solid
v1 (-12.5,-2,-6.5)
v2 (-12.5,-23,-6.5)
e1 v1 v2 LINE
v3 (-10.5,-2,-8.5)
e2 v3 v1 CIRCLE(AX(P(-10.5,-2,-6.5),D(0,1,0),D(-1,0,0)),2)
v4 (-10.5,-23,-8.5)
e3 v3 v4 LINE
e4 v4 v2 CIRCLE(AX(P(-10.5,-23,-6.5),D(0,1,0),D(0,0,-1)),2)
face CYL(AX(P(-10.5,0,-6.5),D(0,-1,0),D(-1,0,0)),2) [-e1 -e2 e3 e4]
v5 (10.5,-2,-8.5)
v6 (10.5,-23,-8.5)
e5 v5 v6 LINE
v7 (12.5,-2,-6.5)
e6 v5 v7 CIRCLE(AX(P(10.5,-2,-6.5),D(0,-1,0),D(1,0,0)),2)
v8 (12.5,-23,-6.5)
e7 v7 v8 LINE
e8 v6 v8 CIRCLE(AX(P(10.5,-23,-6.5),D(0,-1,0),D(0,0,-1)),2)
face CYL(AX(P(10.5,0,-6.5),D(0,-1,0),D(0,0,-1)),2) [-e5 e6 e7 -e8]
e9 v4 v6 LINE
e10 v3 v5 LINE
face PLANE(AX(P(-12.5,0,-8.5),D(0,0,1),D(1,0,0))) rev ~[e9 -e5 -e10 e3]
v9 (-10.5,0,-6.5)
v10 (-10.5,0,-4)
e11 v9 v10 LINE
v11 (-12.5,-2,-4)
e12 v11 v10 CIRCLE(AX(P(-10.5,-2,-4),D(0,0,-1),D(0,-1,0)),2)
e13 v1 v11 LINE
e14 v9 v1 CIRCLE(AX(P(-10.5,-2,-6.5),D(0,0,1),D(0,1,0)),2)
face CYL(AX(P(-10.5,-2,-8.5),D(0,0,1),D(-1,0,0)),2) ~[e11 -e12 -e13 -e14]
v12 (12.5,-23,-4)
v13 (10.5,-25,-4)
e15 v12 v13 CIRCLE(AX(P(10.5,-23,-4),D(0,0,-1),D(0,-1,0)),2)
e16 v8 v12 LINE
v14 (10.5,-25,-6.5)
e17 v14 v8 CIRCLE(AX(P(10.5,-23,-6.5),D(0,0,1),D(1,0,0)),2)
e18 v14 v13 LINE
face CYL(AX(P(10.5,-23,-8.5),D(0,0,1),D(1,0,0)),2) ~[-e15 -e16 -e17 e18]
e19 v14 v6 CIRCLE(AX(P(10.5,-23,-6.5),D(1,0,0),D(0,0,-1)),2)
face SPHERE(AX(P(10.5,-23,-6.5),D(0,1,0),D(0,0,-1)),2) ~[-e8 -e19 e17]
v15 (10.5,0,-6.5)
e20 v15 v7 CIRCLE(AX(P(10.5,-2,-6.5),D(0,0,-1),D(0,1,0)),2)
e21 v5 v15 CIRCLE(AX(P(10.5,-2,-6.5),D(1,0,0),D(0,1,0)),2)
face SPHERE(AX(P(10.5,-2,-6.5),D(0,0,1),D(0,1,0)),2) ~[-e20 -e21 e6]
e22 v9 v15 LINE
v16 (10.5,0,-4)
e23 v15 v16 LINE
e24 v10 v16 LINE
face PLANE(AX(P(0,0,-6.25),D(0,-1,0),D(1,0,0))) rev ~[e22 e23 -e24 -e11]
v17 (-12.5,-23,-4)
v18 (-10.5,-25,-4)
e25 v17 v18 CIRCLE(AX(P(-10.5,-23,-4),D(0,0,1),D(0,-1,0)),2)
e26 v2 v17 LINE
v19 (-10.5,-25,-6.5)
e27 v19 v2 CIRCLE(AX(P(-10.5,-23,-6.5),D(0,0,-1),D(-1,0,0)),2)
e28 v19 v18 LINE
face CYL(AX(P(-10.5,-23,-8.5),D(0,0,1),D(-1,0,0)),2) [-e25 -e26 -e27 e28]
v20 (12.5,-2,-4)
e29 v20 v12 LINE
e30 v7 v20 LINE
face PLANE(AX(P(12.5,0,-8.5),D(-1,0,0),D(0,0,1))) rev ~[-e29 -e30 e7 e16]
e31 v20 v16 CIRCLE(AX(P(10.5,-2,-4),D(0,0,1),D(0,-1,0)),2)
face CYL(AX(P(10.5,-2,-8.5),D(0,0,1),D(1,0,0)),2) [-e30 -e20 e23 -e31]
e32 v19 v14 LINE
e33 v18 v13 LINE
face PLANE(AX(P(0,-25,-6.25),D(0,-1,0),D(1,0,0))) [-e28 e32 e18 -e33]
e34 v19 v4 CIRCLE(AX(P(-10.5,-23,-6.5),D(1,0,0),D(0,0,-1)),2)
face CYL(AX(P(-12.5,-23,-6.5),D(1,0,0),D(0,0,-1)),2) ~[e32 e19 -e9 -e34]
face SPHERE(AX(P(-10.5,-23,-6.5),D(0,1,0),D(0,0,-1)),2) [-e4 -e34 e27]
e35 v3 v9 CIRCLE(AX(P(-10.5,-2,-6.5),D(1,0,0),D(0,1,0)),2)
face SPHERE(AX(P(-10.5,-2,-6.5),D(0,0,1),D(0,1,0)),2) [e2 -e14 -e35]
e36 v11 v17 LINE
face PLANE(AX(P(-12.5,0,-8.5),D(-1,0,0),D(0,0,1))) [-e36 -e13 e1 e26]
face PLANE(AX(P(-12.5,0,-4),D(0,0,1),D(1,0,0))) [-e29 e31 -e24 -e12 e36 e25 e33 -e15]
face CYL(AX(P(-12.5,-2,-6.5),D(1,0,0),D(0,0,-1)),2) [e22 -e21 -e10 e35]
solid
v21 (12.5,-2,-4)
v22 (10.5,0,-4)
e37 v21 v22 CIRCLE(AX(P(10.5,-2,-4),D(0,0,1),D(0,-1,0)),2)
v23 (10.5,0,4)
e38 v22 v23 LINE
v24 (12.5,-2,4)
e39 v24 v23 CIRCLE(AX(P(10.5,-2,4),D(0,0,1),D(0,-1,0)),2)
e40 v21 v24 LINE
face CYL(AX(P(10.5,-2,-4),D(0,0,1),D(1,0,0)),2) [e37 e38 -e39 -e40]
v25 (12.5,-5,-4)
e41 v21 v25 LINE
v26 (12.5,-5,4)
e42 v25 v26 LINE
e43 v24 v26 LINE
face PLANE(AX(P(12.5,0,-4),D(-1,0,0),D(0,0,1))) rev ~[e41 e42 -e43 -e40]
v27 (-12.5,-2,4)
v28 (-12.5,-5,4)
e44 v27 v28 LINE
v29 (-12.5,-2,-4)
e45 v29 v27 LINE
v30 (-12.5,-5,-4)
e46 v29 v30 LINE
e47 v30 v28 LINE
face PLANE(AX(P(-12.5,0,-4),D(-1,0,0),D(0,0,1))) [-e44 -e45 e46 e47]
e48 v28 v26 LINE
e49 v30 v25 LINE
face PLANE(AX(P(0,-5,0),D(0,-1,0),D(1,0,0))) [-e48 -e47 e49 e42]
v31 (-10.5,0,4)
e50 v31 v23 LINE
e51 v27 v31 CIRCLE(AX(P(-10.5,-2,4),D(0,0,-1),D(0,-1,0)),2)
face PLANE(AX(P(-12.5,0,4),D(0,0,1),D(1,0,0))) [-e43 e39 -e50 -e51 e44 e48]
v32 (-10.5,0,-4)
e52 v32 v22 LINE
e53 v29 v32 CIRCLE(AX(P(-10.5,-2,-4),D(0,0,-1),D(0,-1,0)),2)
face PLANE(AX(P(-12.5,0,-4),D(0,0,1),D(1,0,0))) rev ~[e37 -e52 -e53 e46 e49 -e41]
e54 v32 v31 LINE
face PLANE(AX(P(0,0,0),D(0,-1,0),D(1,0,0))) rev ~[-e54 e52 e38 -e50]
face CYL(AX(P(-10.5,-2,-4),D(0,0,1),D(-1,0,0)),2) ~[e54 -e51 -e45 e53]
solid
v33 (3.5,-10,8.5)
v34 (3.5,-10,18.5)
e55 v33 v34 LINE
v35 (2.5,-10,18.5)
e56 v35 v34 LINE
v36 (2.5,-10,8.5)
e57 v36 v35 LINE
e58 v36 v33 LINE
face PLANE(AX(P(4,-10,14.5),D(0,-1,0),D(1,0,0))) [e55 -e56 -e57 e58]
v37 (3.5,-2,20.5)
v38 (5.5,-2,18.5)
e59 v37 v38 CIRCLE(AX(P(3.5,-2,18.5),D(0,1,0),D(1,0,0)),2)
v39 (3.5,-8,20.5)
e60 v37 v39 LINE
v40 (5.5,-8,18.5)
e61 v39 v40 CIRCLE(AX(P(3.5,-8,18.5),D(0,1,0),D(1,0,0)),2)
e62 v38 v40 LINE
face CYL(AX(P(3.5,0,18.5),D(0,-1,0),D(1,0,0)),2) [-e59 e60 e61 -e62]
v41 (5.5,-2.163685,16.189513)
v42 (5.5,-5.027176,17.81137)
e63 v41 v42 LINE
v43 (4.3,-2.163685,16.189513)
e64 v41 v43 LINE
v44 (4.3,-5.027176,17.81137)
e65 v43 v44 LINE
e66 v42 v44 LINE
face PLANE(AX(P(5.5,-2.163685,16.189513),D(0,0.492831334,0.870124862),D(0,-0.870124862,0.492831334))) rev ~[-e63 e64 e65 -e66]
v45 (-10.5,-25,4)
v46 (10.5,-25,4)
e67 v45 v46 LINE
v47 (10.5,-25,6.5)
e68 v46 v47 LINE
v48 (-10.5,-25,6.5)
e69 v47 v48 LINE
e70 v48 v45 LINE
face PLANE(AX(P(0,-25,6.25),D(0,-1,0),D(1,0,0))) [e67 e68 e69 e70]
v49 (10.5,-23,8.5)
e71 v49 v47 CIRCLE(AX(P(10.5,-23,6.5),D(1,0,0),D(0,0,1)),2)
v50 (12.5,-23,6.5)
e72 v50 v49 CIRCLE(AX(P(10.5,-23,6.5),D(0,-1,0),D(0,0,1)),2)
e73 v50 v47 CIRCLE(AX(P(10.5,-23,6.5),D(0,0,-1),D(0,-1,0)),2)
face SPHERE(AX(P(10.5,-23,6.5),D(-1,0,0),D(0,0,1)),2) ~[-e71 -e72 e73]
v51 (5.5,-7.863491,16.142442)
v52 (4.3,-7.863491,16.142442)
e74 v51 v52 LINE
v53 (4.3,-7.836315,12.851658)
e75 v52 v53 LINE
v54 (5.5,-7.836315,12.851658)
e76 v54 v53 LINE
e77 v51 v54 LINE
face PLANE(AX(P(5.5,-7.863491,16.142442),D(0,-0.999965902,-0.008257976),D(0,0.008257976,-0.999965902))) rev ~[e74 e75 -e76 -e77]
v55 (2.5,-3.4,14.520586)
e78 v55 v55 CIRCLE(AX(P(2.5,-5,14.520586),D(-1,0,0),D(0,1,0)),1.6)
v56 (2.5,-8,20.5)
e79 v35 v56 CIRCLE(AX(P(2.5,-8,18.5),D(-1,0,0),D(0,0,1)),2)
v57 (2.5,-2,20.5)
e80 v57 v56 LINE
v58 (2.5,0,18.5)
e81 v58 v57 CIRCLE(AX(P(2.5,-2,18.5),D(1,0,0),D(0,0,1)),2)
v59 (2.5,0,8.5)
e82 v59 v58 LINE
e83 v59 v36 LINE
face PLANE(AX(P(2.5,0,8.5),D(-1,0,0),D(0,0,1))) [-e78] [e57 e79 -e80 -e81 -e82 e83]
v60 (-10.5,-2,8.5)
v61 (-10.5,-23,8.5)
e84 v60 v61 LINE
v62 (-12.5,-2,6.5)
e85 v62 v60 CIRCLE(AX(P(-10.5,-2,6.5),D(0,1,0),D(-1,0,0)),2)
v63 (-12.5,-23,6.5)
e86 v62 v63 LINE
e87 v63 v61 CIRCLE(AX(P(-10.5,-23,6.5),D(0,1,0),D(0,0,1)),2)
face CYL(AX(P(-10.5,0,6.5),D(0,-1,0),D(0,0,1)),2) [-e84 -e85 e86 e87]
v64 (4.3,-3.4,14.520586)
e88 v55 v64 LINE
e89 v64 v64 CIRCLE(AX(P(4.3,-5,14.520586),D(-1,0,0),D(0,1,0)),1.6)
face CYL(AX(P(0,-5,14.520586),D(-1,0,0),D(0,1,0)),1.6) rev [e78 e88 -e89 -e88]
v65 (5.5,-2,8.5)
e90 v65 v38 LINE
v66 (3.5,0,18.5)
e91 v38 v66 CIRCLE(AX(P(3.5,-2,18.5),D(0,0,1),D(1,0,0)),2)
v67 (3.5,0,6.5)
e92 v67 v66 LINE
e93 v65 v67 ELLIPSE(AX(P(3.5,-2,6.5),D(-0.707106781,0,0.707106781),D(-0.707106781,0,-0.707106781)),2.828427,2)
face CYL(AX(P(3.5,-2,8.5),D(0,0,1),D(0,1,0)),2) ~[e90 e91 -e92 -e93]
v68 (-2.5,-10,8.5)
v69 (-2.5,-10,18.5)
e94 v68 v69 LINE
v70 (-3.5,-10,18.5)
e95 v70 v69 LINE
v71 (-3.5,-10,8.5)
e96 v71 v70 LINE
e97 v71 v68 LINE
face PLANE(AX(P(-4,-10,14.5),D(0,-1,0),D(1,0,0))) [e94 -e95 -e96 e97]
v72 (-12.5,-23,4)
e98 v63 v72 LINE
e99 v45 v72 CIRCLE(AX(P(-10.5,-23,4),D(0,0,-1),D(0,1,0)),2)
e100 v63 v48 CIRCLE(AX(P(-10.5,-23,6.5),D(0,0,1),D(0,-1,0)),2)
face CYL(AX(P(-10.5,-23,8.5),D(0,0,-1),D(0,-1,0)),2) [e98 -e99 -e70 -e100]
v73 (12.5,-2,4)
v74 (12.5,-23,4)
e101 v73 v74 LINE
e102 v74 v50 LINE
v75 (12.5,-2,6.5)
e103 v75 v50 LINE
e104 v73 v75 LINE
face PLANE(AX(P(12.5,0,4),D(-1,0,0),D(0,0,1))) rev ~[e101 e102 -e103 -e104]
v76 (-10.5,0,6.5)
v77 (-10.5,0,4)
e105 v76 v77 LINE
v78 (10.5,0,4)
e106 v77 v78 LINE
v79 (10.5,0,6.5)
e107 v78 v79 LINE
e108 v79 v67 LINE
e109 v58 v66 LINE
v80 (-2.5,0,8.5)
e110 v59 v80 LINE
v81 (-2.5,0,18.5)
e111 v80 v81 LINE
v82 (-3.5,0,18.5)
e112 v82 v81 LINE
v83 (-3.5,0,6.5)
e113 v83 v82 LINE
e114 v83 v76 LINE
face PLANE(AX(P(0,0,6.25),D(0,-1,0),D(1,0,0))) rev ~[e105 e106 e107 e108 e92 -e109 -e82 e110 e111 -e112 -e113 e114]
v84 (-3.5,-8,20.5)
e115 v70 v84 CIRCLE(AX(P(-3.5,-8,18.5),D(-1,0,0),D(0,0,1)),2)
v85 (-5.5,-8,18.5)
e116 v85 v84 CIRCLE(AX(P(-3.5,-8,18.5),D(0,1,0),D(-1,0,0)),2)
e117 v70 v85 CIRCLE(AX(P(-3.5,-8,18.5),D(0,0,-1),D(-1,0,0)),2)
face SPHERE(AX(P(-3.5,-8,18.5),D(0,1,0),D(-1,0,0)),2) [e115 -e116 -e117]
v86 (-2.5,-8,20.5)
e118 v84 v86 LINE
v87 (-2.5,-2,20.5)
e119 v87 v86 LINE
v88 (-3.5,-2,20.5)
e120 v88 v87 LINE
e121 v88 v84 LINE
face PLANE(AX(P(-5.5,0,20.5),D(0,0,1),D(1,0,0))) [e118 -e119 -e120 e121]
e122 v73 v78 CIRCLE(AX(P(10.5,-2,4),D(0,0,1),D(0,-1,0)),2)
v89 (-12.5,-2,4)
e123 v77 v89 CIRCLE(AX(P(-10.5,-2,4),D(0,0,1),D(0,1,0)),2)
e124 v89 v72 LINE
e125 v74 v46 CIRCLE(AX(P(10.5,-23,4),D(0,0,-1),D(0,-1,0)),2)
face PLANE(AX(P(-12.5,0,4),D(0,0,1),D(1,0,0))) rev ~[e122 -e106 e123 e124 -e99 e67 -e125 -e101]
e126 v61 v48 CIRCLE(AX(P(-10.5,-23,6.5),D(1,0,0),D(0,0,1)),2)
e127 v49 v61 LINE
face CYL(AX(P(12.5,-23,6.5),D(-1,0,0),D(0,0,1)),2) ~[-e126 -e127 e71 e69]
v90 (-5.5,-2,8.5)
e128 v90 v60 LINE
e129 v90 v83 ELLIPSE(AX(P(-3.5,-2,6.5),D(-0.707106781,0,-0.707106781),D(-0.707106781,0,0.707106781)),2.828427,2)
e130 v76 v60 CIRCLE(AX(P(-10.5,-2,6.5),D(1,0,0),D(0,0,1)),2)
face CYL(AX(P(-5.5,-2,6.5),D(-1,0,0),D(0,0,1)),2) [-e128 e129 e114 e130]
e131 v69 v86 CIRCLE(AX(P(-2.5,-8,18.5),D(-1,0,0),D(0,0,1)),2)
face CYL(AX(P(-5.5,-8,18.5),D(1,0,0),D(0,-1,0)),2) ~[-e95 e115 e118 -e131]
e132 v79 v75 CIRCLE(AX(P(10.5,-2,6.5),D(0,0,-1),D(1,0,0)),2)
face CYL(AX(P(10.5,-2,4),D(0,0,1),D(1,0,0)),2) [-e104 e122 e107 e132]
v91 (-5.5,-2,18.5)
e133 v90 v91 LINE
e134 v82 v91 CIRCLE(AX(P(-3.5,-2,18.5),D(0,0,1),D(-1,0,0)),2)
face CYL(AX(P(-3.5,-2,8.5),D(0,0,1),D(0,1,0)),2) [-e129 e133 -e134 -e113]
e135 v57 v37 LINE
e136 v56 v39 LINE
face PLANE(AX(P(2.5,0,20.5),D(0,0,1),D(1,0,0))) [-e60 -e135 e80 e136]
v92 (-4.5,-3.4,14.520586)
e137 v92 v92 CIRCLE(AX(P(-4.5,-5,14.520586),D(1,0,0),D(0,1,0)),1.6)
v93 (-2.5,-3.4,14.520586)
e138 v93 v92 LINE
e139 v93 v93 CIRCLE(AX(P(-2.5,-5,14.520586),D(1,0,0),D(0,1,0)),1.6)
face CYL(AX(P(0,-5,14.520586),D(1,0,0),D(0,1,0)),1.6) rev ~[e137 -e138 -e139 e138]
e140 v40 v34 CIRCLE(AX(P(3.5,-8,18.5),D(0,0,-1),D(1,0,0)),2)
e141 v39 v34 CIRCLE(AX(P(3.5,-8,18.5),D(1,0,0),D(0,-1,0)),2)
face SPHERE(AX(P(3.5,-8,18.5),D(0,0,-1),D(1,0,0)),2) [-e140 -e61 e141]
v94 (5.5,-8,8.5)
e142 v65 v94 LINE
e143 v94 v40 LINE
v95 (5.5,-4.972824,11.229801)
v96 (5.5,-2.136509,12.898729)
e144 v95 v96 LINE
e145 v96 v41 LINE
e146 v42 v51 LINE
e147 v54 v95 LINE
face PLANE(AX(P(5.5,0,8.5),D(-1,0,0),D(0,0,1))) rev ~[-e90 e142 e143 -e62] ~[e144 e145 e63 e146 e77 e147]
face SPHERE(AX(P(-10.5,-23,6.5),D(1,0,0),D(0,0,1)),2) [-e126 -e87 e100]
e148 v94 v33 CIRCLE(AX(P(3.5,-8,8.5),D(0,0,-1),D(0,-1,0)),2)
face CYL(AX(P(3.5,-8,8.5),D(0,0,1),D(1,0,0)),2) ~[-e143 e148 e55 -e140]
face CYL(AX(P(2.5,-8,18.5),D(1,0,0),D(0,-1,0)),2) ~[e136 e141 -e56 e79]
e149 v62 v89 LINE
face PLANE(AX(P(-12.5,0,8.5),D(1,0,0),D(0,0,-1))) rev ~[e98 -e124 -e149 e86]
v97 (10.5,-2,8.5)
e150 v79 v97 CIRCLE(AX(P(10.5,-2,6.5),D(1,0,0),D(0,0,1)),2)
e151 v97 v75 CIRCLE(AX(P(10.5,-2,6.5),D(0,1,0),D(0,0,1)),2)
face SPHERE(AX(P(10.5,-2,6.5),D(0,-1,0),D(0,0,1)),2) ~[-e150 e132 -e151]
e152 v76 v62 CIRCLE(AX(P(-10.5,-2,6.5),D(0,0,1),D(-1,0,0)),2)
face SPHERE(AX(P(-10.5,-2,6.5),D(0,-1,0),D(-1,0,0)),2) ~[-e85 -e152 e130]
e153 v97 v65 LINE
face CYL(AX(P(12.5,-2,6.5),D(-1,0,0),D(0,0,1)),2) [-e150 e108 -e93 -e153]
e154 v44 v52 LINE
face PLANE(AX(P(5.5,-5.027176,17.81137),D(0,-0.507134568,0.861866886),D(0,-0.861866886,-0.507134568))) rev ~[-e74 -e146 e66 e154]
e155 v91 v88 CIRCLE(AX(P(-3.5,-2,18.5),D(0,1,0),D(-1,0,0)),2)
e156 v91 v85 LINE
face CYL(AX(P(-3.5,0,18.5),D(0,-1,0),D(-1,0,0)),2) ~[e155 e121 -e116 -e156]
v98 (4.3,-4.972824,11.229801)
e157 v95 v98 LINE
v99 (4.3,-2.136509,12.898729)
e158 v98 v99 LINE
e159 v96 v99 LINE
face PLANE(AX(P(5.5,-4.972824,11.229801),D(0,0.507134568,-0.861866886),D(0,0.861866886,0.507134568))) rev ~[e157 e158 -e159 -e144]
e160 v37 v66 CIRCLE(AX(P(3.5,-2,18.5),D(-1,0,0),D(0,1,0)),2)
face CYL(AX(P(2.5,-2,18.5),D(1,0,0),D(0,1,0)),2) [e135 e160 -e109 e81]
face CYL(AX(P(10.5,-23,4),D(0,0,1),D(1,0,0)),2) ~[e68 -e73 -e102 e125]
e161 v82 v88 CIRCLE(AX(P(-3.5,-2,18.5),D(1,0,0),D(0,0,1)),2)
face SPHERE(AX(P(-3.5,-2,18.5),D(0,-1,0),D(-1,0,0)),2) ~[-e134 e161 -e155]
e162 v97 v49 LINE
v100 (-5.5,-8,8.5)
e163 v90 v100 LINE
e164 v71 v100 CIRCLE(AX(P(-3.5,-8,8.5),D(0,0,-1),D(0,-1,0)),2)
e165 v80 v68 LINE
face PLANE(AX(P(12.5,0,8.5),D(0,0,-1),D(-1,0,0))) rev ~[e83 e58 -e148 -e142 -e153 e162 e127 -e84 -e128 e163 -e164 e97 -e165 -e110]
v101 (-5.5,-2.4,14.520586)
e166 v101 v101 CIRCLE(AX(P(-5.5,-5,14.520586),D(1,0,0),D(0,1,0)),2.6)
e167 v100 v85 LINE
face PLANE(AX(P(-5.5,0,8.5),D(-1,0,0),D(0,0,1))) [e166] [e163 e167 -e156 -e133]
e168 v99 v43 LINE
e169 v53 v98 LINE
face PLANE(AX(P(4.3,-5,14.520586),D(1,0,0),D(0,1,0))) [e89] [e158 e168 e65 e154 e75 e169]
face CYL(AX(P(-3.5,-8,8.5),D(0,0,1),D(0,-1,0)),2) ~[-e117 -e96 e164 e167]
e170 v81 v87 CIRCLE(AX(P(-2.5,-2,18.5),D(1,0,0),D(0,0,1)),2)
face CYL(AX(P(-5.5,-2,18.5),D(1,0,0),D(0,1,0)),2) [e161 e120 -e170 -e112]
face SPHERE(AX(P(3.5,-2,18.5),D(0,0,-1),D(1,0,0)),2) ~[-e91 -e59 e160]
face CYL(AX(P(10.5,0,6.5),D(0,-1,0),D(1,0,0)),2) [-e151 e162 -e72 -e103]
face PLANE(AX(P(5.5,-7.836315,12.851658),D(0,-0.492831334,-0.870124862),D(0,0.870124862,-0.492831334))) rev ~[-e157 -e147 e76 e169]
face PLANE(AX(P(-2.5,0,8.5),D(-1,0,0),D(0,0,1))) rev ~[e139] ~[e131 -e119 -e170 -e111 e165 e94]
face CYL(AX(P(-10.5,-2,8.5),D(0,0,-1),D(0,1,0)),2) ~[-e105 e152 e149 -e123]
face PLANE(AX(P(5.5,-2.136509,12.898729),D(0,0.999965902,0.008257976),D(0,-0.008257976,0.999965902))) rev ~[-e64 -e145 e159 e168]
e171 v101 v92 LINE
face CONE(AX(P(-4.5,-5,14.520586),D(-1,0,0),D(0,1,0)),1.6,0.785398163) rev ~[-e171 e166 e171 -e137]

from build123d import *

# Parameters (mm, degrees)
F0_W          = 25
F0_H          = 4.5
F1_DEPTH      = 25
F0_H_2        = 8
F2_DEPTH      = 5
F0_W_2        = 3
F0_H_3        = 12
F3_DEPTH      = 10
F5_DEPTH      = 11.2
F5_DEPTH_BACK = 25
F6_R          = 2
F6_2_R        = 2
F6_3_R        = 2
F7_SIZE       = 1
F9_DEPTH      = 1.2


with BuildPart() as f1:
    # F0 (on Front) → F1 (new body)
    with BuildSketch(Plane.XZ):
        with Locations((0, -6.25)):
            Rectangle(F0_W, F0_H)
    extrude(amount=F1_DEPTH)

    # F6
    f6_edges = [f1.edges().sort_by_distance(p)[0] for p in [
        (12.5, 0, -6.25),
        (-12.5, 0, -6.25),
        (0, 0, -8.5),
        (-12.5, -12.5, -8.5),
        (12.5, -12.5, -8.5),
        (0, -25, -8.5),
        (-12.5, -25, -6.25),
        (12.5, -25, -6.25),
    ]]
    fillet(f6_edges, radius=F6_R)


with BuildPart() as f1b:
    # F0 (on Front) → F1, piece 2 (new body)
    with BuildSketch(Plane.XZ):
        Polygon((12.5, 4), (12.5, 8.5), (5.5, 8.5), (2.5, 8.5), (-2.5, 8.5), (-5.5, 8.5), (-12.5, 8.5), (-12.5, 4), align=None)
    extrude(amount=F1_DEPTH)

    # F0 (on Front) → F3 (join)
    with BuildSketch(Plane.XZ):
        with Locations((4, 14.5)):
            Rectangle(F0_W_2, F0_H_3)
        with Locations((-4, 14.5)):
            Rectangle(F0_W_2, F0_H_3)
    extrude(amount=F3_DEPTH)

    # F4 (on Right) → F5 (cut, two sides)
    with BuildSketch(Plane.YZ) as f5_sk:
        with BuildLine():
            ThreePointArc((-6.6, 14.520585537), (-5, 12.920585537), (-3.4, 14.520585537))
            Line((-3.4, 14.520585537), (-6.6, 14.520585537))
        make_face()
        with BuildLine():
            Line((-6.6, 14.520585537), (-3.4, 14.520585537))
            ThreePointArc((-3.4, 14.520585537), (-5, 16.120585537), (-6.6, 14.520585537))
        make_face()
    extrude(amount=-F5_DEPTH, mode=Mode.SUBTRACT)
    extrude(f5_sk.sketch, amount=F5_DEPTH_BACK, mode=Mode.SUBTRACT)

    # F6#2
    f6_2_edges = [f1b.edges().sort_by_distance(p)[0] for p in [
        (-5.5, -5, 20.5),
        (0, -25, 8.5),
        (12.5, -12.5, 8.5),
        (-12.5, -12.5, 8.5),
        (-12.5, 0, 6.25),
        (-9, 0, 8.5),
        (9, 0, 8.5),
        (12.5, 0, 6.25),
        (-5.5, 0, 14.5),
        (-5.5, -10, 14.5),
        (5.5, 0, 14.5),
        (5.5, -10, 14.5),
        (12.5, -25, 6.25),
        (-12.5, -25, 6.25),
        (5.5, -5, 20.5),
        (4, -10, 20.5),
        (4, 0, 20.5),
        (-4, 0, 20.5),
        (-4, -10, 20.5),
    ]]
    fillet(f6_2_edges, radius=F6_2_R)

    # F7
    f7_edges = [f1b.edges().sort_by_distance(p)[0] for p in [
        (-5.5, -6.6, 14.520586),
    ]]
    chamfer(f7_edges, length=F7_SIZE)

    # F8 (on face) → F9 (cut)
    with BuildSketch(Plane.YZ.offset(5.5)):
        Polygon((-5.0271761454, 17.8113698594), (-7.8634908944, 16.1424424659), (-7.8363147489, 12.8516581434), (-4.9728238546, 11.2298012145), (-2.1365091056, 12.898728608), (-2.1636852511, 16.1895129305), align=None)
    extrude(amount=-F9_DEPTH, mode=Mode.SUBTRACT)


with BuildPart() as f2:
    # F0 (on Front) → F2 (new body)
    with BuildSketch(Plane.XZ):
        Rectangle(F0_W, F0_H_2)
    extrude(amount=F2_DEPTH)

    # F6#3
    f6_3_edges = [f2.edges().sort_by_distance(p)[0] for p in [
        (12.5, 0, 0),
        (-12.5, 0, 0),
    ]]
    fillet(f6_3_edges, radius=F6_3_R)


solid = Compound([f1.part, f1b.part, f2.part])
